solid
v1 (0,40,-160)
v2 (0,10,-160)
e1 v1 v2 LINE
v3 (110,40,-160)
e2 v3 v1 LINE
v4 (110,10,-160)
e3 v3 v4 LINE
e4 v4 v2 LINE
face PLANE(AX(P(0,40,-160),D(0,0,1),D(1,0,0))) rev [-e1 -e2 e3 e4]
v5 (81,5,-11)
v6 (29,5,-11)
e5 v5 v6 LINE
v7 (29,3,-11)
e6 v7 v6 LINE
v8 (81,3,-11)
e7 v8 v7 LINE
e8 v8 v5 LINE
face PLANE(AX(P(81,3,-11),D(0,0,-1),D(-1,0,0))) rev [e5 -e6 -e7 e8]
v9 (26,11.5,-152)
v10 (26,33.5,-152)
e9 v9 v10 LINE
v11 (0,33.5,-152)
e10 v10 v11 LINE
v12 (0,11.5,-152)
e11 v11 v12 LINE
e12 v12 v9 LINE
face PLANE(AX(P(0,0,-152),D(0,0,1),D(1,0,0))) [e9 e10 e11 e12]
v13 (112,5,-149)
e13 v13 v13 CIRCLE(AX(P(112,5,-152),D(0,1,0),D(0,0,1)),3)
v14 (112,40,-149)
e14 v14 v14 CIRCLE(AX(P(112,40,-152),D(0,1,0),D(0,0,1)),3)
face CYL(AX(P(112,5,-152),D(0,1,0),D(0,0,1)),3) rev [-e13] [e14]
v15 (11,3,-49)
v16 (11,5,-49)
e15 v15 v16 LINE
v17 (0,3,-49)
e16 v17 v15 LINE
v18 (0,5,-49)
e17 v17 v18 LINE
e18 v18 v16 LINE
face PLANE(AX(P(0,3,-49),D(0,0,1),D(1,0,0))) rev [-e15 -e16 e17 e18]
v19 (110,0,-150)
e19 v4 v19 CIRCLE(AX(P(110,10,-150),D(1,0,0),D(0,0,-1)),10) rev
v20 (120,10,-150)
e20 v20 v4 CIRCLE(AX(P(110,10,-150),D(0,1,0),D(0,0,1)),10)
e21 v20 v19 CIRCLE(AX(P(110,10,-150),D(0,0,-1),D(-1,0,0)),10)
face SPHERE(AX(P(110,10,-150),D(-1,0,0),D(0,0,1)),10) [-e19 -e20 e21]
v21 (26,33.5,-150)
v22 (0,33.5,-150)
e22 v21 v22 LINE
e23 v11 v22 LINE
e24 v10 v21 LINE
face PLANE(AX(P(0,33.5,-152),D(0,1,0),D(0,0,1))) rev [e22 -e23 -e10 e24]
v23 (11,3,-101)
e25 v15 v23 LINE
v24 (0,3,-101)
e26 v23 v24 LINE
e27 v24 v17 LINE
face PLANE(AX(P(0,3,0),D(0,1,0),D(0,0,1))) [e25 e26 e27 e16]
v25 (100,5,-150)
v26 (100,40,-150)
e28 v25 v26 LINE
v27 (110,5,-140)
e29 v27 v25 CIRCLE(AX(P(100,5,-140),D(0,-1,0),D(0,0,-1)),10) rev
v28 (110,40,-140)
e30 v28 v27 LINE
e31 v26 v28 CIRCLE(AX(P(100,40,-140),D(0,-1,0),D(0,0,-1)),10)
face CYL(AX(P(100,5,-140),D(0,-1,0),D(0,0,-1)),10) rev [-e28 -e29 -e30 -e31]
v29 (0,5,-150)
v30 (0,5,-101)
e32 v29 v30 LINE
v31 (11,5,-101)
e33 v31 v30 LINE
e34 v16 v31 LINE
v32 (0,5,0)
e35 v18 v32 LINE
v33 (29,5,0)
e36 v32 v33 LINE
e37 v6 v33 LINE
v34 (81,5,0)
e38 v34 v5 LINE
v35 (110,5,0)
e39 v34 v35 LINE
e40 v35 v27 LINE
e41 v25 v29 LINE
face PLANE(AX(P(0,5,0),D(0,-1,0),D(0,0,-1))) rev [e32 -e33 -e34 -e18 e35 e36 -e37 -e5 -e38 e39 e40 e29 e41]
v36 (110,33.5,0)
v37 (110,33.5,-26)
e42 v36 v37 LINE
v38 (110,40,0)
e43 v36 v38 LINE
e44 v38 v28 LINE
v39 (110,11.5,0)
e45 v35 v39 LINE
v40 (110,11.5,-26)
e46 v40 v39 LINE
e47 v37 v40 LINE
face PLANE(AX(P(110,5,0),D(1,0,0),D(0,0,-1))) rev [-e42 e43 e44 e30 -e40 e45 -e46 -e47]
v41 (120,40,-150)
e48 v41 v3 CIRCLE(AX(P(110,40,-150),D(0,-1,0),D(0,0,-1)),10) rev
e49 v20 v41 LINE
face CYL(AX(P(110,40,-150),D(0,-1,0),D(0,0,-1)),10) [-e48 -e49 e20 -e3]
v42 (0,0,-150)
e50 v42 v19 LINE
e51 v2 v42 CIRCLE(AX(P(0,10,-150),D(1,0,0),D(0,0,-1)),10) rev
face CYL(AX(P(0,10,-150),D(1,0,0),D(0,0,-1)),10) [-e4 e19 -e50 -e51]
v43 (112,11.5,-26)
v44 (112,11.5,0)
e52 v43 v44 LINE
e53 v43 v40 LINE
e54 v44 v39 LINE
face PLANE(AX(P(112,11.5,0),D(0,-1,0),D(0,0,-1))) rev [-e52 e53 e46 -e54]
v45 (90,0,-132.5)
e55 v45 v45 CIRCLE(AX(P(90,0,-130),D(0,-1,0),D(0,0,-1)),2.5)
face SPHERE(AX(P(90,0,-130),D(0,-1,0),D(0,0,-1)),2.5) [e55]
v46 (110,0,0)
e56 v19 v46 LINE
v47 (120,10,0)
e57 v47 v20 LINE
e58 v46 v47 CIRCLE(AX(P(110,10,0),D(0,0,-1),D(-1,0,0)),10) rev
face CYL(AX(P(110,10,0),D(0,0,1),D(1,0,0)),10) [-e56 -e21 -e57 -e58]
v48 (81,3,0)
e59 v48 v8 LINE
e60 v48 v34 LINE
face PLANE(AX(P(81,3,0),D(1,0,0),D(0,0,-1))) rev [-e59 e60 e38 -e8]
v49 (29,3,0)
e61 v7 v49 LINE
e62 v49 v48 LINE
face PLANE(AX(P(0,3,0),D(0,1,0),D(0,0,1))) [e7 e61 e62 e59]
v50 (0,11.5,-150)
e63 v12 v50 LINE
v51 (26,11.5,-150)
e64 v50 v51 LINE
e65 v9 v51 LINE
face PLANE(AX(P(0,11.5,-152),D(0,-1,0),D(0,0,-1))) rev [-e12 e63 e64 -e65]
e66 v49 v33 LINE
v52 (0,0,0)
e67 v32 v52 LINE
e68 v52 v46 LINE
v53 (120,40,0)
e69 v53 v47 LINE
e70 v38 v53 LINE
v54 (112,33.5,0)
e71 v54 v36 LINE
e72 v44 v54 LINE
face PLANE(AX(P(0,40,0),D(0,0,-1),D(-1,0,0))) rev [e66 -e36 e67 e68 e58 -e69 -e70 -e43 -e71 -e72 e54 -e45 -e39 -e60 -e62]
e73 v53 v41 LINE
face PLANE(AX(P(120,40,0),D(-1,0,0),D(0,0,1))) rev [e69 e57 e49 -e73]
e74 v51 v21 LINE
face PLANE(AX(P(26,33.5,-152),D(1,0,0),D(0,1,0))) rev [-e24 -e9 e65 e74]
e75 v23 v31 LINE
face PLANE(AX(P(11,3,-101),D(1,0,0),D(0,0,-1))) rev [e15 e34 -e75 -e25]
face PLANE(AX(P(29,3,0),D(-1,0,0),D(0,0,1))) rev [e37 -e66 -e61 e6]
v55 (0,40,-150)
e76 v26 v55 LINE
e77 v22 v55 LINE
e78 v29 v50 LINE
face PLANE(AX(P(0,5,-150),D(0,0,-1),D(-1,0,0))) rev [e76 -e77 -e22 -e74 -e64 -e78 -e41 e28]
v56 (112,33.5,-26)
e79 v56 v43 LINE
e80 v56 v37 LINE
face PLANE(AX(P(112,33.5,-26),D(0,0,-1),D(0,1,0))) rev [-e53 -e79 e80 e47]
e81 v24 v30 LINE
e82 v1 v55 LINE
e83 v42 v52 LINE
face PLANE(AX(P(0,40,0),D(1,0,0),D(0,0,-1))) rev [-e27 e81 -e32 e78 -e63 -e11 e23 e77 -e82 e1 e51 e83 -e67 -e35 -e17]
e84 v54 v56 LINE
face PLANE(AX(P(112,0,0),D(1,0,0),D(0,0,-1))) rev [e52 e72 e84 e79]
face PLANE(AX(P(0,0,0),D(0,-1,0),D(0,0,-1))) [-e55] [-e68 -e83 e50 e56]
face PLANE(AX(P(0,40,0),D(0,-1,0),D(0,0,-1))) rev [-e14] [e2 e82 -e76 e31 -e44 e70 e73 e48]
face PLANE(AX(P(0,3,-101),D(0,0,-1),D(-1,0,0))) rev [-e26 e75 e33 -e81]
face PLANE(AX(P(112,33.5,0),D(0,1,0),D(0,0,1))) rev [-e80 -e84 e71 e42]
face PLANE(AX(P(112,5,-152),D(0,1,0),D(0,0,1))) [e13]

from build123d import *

# Parameters (mm, degrees)
ESQUISSE1_W             = 120
ESQUISSE1_H             = 160
BOSS_EXTRU_1_DEPTH      = 40
CONG_1_R                = 10
CONG_2_R                = 10
ESQUISSE2_W             = 110
ESQUISSE2_H             = 150
ENL_V_MAT_EXTRU_1_DEPTH = 35
CONG_3_R                = 10
ESQUISSE3_R             = 3
ENL_V_MAT_EXTRU_2_DEPTH = 35
ESQUISSE4_R             = 2.5
BOSS_EXTRU_2_DEPTH      = 2.5
CONG_4_R                = 2.5
ESQUISSE5_W             = 11
ESQUISSE5_H             = 52
ESQUISSE5_W_2           = 52
ESQUISSE5_H_2           = 11
ENL_V_MAT_EXTRU_3_DEPTH = 2
ESQUISSE6_W             = 26
ESQUISSE6_H             = 22
ENL_V_MAT_EXTRU_4_DEPTH = 2
ESQUISSE7_W             = 26
ESQUISSE7_H             = 22
ENL_V_MAT_EXTRU_5_DEPTH = 2


with BuildPart() as part:
    # Esquisse1 → Boss.-Extru.1 (new body)
    with BuildSketch(Plane(origin=(0, 0, 0), x_dir=(1, 0, 0), z_dir=(0, 1, 0))):
        with Locations((60, 80)):
            Rectangle(ESQUISSE1_W, ESQUISSE1_H)
    extrude(amount=BOSS_EXTRU_1_DEPTH)

    # Congé1
    cong_1_edges = [part.edges().sort_by_distance(p)[0] for p in [
        (60, 0, -160),
    ]]
    fillet(cong_1_edges, radius=CONG_1_R)

    # Congé2
    cong_2_edges = [part.edges().sort_by_distance(p)[0] for p in [
        (120, 2.928932188, -157.071067812),
        (120, 0, -75),
        (120, 25, -160),
    ]]
    fillet(cong_2_edges, radius=CONG_2_R)

    # Esquisse2 → Enlèv. mat.-Extru.1 (cut)
    with BuildSketch(Plane(origin=(0, 40, 0), x_dir=(1, 0, 0), z_dir=(0, 1, 0))):
        with Locations((55, 75)):
            Rectangle(ESQUISSE2_W, ESQUISSE2_H)
    extrude(amount=-ENL_V_MAT_EXTRU_1_DEPTH, mode=Mode.SUBTRACT)

    # Congé3
    cong_3_edges = [part.edges().sort_by_distance(p)[0] for p in [
        (110, 22.5, -150),
    ]]
    fillet(cong_3_edges, radius=CONG_3_R)

    # Esquisse3 → Enlèv. mat.-Extru.2 (cut)
    with BuildSketch(Plane(origin=(0, 40, 0), x_dir=(1, 0, 0), z_dir=(0, 1, 0))):
        with Locations(Location((112, 152, 0), (0, 0, 270))):
            Circle(ESQUISSE3_R)
    extrude(amount=-ENL_V_MAT_EXTRU_2_DEPTH, mode=Mode.SUBTRACT)

    # Esquisse4 → Boss.-Extru.2 (add)
    with BuildSketch(Plane.XZ):
        with Locations(Location((90, -130, 0), (0, 0, 270))):
            Circle(ESQUISSE4_R)
    extrude(amount=BOSS_EXTRU_2_DEPTH)

    # Congé4
    cong_4_edges = [part.edges().sort_by_distance(p)[0] for p in [
        (90, -2.5, -127.5),
    ]]
    fillet(cong_4_edges, radius=CONG_4_R - 0.0001)  # a hair under: the kernel refuses the full size

    # Esquisse5 → Enlèv. mat.-Extru.3 (cut)
    with BuildSketch(Plane(origin=(0, 5, 0), x_dir=(1, 0, 0), z_dir=(0, 1, 0))):
        with Locations((5.5, 75)):
            Rectangle(ESQUISSE5_W, ESQUISSE5_H)
        with Locations((55, 5.5)):
            Rectangle(ESQUISSE5_W_2, ESQUISSE5_H_2)
    extrude(amount=-ENL_V_MAT_EXTRU_3_DEPTH, mode=Mode.SUBTRACT)

    # Esquisse6 → Enlèv. mat.-Extru.4 (cut)
    with BuildSketch(Plane.XY.offset(-150)):
        with Locations((13, 22.5)):
            Rectangle(ESQUISSE6_W, ESQUISSE6_H)
    extrude(amount=-ENL_V_MAT_EXTRU_4_DEPTH, mode=Mode.SUBTRACT)

    # Esquisse7 → Enlèv. mat.-Extru.5 (cut)
    with BuildSketch(Plane.ZY.offset(-110)):
        with Locations((-13, 22.5)):
            Rectangle(ESQUISSE7_W, ESQUISSE7_H)
    extrude(amount=-ENL_V_MAT_EXTRU_5_DEPTH, mode=Mode.SUBTRACT)


solid = part.part
